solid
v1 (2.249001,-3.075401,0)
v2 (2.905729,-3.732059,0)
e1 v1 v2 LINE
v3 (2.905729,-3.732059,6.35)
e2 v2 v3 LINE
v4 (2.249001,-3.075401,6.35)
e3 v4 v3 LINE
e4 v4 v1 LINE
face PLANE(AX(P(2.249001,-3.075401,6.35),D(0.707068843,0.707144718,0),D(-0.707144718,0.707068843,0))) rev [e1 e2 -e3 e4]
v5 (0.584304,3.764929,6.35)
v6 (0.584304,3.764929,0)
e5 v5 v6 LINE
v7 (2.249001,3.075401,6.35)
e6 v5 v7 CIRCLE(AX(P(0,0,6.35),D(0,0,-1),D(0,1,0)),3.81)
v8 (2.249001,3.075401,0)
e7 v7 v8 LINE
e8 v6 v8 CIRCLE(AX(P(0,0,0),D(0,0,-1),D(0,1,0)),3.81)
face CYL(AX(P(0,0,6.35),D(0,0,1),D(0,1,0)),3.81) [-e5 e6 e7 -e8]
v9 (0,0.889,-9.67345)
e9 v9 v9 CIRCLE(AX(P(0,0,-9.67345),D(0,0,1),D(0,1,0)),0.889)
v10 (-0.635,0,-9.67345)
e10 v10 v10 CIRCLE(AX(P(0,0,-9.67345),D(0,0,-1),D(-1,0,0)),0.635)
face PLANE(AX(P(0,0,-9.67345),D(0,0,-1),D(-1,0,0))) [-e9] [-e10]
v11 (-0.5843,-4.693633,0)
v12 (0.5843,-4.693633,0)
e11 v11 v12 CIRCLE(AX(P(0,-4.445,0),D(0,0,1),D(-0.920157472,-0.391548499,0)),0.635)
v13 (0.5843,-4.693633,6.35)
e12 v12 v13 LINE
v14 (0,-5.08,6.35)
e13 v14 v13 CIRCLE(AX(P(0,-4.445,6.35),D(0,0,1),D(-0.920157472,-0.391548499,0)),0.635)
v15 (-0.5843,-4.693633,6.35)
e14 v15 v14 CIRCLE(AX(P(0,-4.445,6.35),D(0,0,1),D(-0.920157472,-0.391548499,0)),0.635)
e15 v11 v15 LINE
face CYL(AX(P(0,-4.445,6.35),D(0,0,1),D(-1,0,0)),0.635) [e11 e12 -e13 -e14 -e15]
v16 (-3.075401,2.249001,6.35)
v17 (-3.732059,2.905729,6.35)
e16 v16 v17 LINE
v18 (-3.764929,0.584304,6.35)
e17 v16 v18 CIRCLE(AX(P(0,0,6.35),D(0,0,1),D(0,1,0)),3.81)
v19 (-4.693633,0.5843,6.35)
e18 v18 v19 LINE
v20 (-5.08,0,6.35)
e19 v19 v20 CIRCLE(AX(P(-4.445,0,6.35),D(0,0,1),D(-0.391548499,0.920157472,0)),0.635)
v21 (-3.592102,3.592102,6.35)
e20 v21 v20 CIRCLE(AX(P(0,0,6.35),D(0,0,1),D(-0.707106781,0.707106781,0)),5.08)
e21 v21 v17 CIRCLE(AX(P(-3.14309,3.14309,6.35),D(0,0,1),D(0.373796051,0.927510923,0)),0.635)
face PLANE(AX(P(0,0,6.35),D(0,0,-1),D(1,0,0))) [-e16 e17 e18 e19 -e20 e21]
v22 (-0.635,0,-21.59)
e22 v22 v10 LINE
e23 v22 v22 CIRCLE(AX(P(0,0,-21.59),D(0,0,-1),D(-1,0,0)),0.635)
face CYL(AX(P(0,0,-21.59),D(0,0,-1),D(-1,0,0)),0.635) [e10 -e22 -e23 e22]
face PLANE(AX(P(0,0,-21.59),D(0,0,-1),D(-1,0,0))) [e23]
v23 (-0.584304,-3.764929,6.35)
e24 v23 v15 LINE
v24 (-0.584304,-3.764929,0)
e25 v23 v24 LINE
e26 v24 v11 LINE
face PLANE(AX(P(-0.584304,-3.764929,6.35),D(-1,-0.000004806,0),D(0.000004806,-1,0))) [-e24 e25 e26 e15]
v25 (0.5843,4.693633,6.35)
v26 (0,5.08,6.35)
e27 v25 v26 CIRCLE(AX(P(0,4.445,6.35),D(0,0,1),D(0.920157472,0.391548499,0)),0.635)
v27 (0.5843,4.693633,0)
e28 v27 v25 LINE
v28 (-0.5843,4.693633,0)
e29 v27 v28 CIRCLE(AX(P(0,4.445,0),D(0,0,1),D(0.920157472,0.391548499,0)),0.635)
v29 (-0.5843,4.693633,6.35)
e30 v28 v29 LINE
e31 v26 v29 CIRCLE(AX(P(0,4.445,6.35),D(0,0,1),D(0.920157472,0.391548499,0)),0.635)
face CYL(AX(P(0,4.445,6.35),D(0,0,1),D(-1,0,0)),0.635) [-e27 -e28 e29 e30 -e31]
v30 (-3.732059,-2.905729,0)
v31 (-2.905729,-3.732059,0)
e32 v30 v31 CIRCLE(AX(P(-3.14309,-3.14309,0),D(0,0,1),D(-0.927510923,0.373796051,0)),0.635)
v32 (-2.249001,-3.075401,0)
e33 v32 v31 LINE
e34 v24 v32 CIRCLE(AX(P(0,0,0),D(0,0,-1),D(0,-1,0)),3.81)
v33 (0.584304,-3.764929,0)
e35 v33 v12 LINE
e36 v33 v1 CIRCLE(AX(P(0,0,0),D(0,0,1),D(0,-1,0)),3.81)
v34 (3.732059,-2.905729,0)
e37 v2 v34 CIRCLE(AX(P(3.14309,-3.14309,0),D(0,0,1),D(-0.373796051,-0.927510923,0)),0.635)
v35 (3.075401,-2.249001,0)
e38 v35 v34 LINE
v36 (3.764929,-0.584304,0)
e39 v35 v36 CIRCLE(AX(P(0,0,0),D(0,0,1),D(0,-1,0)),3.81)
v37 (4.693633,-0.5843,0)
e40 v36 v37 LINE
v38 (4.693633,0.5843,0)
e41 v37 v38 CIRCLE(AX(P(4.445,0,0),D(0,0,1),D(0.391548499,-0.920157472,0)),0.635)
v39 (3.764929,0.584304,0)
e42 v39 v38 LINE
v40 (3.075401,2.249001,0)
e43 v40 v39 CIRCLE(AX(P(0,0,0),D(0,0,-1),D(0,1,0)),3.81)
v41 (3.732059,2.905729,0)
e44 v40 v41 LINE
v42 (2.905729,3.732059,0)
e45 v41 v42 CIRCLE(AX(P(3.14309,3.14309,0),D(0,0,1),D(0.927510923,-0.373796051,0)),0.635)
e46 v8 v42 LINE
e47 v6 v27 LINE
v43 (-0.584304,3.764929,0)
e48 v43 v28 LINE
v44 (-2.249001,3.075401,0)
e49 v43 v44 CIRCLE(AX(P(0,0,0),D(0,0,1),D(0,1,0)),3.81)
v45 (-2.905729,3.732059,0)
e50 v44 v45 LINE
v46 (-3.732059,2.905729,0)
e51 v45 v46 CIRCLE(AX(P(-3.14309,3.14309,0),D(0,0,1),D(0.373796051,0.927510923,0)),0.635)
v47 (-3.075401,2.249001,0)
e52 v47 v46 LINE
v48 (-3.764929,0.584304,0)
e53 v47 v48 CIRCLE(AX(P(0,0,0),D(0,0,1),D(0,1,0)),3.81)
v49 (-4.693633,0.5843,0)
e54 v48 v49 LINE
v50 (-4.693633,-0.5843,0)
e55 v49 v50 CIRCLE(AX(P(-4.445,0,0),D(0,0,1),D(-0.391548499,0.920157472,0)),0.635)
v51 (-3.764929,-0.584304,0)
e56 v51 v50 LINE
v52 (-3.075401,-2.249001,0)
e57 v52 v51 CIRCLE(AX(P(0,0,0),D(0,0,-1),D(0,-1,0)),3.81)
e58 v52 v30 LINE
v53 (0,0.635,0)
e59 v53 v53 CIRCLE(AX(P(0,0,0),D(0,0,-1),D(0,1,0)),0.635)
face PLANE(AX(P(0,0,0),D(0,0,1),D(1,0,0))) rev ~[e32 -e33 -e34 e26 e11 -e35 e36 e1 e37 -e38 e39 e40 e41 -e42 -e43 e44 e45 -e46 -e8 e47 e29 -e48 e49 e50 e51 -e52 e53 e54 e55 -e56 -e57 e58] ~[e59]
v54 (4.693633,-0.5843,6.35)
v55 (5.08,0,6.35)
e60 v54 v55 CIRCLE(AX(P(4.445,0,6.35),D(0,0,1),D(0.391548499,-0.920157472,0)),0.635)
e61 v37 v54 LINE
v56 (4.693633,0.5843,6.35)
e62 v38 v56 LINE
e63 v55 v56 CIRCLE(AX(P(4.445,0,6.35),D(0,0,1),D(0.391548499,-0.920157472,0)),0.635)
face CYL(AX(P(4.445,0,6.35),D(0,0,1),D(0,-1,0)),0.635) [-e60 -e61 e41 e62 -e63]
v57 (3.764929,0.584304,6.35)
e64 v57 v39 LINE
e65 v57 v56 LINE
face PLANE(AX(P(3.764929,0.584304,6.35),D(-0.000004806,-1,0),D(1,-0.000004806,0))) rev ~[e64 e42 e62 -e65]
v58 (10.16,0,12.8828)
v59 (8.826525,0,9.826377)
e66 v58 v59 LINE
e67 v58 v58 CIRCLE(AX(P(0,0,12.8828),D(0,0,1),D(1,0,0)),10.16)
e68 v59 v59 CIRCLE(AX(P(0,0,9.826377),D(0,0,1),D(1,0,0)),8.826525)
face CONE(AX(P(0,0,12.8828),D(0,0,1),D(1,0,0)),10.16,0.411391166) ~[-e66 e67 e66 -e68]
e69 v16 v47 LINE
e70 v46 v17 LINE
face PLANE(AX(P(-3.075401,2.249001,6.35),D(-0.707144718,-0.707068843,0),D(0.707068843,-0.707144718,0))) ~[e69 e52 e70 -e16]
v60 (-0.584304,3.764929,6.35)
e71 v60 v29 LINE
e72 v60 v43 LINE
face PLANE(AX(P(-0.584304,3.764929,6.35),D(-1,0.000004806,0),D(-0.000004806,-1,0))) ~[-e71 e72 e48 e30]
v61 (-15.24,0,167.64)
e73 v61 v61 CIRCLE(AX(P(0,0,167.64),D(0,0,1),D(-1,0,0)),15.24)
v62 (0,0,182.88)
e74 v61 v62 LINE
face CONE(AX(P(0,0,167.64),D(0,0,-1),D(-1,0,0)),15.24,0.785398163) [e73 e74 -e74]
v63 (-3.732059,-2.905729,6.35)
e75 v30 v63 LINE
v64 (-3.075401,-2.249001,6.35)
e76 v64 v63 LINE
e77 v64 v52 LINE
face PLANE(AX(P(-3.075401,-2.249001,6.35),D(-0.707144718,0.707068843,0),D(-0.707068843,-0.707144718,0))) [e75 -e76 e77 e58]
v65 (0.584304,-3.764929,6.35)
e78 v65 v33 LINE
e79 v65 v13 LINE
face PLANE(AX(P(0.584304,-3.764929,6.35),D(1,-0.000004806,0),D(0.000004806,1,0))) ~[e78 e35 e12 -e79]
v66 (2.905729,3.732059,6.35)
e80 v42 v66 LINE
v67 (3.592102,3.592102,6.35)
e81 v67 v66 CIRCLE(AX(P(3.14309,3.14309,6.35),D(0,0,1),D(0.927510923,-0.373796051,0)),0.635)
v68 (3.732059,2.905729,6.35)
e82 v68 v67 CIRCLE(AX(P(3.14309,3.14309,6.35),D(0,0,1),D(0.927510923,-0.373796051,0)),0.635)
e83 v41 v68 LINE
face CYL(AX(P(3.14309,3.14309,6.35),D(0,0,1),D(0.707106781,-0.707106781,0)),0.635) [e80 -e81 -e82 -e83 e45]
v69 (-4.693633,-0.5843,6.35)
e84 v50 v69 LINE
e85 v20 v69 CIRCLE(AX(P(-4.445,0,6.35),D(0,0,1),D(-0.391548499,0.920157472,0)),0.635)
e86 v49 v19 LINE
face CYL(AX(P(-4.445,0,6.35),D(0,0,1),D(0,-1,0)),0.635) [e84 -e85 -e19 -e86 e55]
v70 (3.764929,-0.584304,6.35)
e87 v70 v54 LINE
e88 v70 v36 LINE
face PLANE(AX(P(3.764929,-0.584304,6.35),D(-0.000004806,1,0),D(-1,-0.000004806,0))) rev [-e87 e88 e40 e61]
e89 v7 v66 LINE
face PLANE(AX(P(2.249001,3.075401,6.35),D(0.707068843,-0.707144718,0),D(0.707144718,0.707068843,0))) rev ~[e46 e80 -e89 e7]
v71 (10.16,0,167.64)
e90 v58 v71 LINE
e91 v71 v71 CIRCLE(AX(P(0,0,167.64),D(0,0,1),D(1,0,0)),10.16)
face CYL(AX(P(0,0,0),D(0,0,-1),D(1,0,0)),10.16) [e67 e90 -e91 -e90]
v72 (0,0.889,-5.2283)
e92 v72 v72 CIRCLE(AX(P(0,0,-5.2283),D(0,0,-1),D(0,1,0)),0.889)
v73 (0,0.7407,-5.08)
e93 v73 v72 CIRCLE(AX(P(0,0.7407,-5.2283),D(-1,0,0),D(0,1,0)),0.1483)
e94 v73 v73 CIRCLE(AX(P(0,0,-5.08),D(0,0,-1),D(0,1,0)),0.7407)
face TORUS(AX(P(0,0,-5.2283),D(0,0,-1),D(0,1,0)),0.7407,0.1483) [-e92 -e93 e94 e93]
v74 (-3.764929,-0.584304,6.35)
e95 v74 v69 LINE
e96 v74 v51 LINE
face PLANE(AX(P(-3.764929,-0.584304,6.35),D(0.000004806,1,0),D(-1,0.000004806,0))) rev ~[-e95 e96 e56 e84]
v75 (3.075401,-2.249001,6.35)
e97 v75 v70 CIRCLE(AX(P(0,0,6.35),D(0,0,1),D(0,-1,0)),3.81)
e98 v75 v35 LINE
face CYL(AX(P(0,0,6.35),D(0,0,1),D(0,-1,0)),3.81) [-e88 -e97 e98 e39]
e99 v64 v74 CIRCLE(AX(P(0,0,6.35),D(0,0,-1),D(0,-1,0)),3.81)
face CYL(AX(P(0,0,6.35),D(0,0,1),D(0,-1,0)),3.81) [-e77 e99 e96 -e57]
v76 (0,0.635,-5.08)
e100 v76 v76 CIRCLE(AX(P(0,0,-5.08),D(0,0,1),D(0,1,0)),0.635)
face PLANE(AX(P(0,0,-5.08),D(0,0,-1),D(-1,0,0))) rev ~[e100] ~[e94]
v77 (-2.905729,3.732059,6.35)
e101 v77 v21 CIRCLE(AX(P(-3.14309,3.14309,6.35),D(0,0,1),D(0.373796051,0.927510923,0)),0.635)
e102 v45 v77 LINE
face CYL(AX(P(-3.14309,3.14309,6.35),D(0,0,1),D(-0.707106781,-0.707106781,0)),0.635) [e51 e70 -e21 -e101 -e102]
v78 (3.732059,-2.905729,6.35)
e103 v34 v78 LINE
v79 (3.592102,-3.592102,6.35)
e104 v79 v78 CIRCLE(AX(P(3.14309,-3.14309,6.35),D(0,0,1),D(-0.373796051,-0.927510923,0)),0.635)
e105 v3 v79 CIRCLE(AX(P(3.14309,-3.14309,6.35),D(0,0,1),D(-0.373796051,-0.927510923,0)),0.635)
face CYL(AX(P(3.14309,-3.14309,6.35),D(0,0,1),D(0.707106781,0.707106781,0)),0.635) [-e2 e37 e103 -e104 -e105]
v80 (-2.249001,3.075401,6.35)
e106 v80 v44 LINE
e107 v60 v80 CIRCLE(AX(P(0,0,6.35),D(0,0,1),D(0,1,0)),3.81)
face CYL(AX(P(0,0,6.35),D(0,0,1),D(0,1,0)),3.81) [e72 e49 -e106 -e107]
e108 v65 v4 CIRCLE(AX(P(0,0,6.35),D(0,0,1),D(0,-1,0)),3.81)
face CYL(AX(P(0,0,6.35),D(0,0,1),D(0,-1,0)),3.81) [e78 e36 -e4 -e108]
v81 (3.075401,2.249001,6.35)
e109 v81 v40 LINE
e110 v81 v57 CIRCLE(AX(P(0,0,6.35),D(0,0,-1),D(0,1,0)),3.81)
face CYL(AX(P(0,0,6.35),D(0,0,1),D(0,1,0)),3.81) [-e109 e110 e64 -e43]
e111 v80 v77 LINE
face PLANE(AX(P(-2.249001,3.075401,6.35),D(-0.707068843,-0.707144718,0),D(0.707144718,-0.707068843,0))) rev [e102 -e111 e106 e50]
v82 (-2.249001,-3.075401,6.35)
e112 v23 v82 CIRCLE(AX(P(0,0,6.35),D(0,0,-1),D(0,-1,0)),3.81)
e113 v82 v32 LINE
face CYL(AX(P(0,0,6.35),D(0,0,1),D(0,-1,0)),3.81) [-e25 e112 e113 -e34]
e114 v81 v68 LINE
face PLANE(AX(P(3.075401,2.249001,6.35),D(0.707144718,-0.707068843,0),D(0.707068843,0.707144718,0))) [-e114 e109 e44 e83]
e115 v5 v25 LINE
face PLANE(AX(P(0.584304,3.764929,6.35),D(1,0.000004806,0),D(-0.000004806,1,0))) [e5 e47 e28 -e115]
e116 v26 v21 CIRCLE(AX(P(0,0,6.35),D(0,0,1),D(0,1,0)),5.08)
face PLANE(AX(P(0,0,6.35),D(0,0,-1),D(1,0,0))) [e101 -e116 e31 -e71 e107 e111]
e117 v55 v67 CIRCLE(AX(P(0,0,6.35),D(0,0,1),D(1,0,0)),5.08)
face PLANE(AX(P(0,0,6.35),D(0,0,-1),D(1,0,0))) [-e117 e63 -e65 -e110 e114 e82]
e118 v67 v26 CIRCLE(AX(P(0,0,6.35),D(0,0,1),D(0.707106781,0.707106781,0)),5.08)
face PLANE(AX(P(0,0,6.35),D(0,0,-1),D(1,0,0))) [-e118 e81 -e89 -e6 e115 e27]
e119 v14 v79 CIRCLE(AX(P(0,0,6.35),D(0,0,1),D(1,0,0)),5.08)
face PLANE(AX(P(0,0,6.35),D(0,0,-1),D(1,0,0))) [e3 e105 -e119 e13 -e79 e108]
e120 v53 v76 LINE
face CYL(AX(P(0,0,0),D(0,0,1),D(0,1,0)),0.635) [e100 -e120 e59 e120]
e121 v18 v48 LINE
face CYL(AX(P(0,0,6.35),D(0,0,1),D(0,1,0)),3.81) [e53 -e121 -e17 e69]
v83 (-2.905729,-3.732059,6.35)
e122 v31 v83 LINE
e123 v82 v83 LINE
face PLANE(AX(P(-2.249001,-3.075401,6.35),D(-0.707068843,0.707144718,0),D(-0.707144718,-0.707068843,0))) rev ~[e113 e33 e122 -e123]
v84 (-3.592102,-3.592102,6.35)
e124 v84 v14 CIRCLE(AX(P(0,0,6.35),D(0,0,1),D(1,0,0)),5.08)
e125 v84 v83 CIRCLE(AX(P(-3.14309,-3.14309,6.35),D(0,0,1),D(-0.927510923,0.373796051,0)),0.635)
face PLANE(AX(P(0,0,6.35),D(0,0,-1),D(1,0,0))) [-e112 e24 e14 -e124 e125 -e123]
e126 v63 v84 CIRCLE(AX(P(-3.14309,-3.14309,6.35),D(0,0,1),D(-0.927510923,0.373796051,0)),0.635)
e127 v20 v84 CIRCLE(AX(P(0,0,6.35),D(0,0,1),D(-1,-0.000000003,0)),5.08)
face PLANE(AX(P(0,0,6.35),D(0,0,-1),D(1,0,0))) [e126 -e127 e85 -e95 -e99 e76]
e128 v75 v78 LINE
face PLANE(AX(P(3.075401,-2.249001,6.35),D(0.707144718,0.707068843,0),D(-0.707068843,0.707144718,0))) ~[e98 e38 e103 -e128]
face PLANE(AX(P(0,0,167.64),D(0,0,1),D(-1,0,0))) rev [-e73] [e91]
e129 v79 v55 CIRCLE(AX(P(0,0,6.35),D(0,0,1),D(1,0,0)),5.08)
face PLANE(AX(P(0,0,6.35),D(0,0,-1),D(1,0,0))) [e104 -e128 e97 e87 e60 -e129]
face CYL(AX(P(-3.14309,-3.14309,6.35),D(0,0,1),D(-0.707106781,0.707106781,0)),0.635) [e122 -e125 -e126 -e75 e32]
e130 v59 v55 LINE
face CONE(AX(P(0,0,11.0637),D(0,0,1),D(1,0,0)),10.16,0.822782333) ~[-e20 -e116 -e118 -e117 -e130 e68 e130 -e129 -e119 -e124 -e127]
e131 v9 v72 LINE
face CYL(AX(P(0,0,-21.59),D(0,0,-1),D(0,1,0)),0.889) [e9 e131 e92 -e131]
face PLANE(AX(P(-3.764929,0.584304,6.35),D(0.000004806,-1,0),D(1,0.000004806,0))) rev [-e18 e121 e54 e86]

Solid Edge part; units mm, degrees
sketch "Sketch1" plane through (0, 0, 0) normal (0, 0, 1) x (1, 0, 0)
  circle A0 centre (0, 0) radius 10.16
extrude "Protrusion1" add sketch "Sketch1" along normal blind 167.64
sketch "Sketch2" plane through (0, 0, 0) normal (0, -1, 0) x (1, 0, 0)
  line L0 (0, 167.64) -> (0, 182.88)
  line L1 (-15.24, 167.64) -> (0, 182.88)
  line L2 (0, 167.64) -> (-15.24, 167.64)
revolve "RevolvedProtrusion1" add sketch "Sketch2" angle 360 about axis through (0, 0, 167.64) along (0, 0, 1)
sketch "Sketch3" plane through (0, 0, 0) normal (0, -1, 0) x (1, 0, 0)
  line L0 (5.08, 0) -> (10.16, 0)
  line L1 (10.16, 0) -> (10.16, 6.35)
  line L2 (10.16, 6.35) -> (5.08, 6.35)
  line L3 (5.08, 6.35) -> (5.08, 0)
revolve "RevolvedCutout1" cut sketch "Sketch3" angle 360 about axis through (0, 0, 9.2175) along (0, 0, -1)
sketch "Sketch4" plane through (0, 0, 0) normal (0, 0, -1) x (0, 1, 0)
  circle A0 centre (0, 0) radius 0.635
extrude "Protrusion2" add sketch "Sketch4" along normal blind 21.59
sketch "Sketch5" plane through (0, 0, 0) normal (0, 0, -1) x (0, -1, 0)
  arc A0 (2.249, 3.0754) -> (0.5843, 3.7649) centre (0, 0) ccw
  line L0 (0.5843, 3.7649) -> (0.5843, 5.0463)
  arc A1 (0.5843, 5.0463) -> (3.1551, 3.9814) centre (0, 0) cw
  line L1 (2.249, 3.0754) -> (3.1551, 3.9814)
extrude "Cutout1" cut sketch "Sketch5" along normal up to surface (6.35 mm away) from surface at -6.35
sketch "Sketch6" plane through (0, 0, 0) normal (0, 0, -1) x (0, -1, 0)
  arc A0 (3.7649, 0.5843) -> (3.0754, 2.249) centre (0, 0) ccw
  line L0 (3.0754, 2.249) -> (3.9814, 3.1551)
  arc A1 (3.9814, 3.1551) -> (5.0463, 0.5843) centre (0, 0) cw
  line L1 (3.7649, 0.5843) -> (5.0463, 0.5843)
extrude "Cutout2" cut sketch "Sketch6" along normal up to surface (6.35 mm away) from surface at -6.35
mirror "Mirror1" about plane through (0, 0, 0) normal (0, -1, 0) of "Cutout1", "Cutout2"
mirror "Mirror2" about plane through (0, 0, 0) normal (1, 0, 0) of "Cutout2", "Cutout1"
mirror "Mirror3" about plane through (0, 0, 0) normal (0, -1, 0) of "Mirror2"
sketch "Sketch7" plane through (0, 0, 0) normal (0, 0, -1) x (0, -1, 0)
  arc A0 (-0.5843, 5.0463) -> (0, 5.08) centre (0, 0) cw
  line L0 (-0.5843, 4.6936) -> (-0.5843, 5.0463)
  arc A1 (-0.5843, 4.6936) -> (0, 5.08) centre (0, 4.445) cw
extrude "Cutout9" cut sketch "Sketch7" along normal up to surface (6.35 mm away) from surface at -6.35
mirror "Mirror4" about plane through (0, 0, 0) normal (0, -1, 0) of "Cutout9"
mirror "Mirror5" about plane through (0, 0, 0) normal (0.3826834, -0.9238795, 0) of "Cutout9"
mirror "Mirror6" about plane through (0, 0, 0) normal (0.3826834, -0.9238795, 0) of "Cutout9", "Mirror4"
mirror "Mirror7" about plane through (0, 0, 0) normal (0, -1, 0) of "Mirror6"
mirror "Mirror8" about plane through (0, 0, 0) normal (1, 0, 0) of "Cutout9", "Mirror4", "Mirror6", "Mirror7"
mirror "Mirror9" about plane through (0, 0, 0) normal (0.3826834, -0.9238795, 0) of "Mirror7"
mirror "Mirror10" about plane through (0, 0, 0) normal (0, -1, 0) of "Mirror9"
sketch "Sketch8" plane through (0, 0, 0) normal (0, -1, 0) x (1, 0, 0)
  line L0 (10.16, 11.0637) -> (5.08, 6.35)
  line L1 (10.16, 6.35) -> (5.08, 6.35)
  line L2 (10.16, 11.0637) -> (10.16, 6.35)
revolve "RevolvedCutout2" cut sketch "Sketch8" angle 360 about axis through (0, 0, 6.35) along (0, 0, 1)
sketch "Sketch9" plane through (0, 0, -21.59) normal (0, 0, -1) x (0, 1, 0)
  circle A0 centre (0, 0) radius 0.889
extrude "Protrusion3" add sketch "Sketch9" against normal blind 16.51
chamfer "Chamfer_1" distance 1.8191 angle 45 1 edges at (-10.16, 0, 11.0637)
fillet "Round_2" radius 0.1483 1 edges at (0, -0.889, -5.08)
sketch "Sketch10" plane through (0, 0, -21.59) normal (0, 0, -1) x (-1, 0, 0)
  circle A0 centre (0, 0) radius 0.635
  circle A1 centre (0, 0) radius 0.889
extrude "ExtrudedCutout_36" cut sketch "Sketch10" along normal mid plane 23.8331
